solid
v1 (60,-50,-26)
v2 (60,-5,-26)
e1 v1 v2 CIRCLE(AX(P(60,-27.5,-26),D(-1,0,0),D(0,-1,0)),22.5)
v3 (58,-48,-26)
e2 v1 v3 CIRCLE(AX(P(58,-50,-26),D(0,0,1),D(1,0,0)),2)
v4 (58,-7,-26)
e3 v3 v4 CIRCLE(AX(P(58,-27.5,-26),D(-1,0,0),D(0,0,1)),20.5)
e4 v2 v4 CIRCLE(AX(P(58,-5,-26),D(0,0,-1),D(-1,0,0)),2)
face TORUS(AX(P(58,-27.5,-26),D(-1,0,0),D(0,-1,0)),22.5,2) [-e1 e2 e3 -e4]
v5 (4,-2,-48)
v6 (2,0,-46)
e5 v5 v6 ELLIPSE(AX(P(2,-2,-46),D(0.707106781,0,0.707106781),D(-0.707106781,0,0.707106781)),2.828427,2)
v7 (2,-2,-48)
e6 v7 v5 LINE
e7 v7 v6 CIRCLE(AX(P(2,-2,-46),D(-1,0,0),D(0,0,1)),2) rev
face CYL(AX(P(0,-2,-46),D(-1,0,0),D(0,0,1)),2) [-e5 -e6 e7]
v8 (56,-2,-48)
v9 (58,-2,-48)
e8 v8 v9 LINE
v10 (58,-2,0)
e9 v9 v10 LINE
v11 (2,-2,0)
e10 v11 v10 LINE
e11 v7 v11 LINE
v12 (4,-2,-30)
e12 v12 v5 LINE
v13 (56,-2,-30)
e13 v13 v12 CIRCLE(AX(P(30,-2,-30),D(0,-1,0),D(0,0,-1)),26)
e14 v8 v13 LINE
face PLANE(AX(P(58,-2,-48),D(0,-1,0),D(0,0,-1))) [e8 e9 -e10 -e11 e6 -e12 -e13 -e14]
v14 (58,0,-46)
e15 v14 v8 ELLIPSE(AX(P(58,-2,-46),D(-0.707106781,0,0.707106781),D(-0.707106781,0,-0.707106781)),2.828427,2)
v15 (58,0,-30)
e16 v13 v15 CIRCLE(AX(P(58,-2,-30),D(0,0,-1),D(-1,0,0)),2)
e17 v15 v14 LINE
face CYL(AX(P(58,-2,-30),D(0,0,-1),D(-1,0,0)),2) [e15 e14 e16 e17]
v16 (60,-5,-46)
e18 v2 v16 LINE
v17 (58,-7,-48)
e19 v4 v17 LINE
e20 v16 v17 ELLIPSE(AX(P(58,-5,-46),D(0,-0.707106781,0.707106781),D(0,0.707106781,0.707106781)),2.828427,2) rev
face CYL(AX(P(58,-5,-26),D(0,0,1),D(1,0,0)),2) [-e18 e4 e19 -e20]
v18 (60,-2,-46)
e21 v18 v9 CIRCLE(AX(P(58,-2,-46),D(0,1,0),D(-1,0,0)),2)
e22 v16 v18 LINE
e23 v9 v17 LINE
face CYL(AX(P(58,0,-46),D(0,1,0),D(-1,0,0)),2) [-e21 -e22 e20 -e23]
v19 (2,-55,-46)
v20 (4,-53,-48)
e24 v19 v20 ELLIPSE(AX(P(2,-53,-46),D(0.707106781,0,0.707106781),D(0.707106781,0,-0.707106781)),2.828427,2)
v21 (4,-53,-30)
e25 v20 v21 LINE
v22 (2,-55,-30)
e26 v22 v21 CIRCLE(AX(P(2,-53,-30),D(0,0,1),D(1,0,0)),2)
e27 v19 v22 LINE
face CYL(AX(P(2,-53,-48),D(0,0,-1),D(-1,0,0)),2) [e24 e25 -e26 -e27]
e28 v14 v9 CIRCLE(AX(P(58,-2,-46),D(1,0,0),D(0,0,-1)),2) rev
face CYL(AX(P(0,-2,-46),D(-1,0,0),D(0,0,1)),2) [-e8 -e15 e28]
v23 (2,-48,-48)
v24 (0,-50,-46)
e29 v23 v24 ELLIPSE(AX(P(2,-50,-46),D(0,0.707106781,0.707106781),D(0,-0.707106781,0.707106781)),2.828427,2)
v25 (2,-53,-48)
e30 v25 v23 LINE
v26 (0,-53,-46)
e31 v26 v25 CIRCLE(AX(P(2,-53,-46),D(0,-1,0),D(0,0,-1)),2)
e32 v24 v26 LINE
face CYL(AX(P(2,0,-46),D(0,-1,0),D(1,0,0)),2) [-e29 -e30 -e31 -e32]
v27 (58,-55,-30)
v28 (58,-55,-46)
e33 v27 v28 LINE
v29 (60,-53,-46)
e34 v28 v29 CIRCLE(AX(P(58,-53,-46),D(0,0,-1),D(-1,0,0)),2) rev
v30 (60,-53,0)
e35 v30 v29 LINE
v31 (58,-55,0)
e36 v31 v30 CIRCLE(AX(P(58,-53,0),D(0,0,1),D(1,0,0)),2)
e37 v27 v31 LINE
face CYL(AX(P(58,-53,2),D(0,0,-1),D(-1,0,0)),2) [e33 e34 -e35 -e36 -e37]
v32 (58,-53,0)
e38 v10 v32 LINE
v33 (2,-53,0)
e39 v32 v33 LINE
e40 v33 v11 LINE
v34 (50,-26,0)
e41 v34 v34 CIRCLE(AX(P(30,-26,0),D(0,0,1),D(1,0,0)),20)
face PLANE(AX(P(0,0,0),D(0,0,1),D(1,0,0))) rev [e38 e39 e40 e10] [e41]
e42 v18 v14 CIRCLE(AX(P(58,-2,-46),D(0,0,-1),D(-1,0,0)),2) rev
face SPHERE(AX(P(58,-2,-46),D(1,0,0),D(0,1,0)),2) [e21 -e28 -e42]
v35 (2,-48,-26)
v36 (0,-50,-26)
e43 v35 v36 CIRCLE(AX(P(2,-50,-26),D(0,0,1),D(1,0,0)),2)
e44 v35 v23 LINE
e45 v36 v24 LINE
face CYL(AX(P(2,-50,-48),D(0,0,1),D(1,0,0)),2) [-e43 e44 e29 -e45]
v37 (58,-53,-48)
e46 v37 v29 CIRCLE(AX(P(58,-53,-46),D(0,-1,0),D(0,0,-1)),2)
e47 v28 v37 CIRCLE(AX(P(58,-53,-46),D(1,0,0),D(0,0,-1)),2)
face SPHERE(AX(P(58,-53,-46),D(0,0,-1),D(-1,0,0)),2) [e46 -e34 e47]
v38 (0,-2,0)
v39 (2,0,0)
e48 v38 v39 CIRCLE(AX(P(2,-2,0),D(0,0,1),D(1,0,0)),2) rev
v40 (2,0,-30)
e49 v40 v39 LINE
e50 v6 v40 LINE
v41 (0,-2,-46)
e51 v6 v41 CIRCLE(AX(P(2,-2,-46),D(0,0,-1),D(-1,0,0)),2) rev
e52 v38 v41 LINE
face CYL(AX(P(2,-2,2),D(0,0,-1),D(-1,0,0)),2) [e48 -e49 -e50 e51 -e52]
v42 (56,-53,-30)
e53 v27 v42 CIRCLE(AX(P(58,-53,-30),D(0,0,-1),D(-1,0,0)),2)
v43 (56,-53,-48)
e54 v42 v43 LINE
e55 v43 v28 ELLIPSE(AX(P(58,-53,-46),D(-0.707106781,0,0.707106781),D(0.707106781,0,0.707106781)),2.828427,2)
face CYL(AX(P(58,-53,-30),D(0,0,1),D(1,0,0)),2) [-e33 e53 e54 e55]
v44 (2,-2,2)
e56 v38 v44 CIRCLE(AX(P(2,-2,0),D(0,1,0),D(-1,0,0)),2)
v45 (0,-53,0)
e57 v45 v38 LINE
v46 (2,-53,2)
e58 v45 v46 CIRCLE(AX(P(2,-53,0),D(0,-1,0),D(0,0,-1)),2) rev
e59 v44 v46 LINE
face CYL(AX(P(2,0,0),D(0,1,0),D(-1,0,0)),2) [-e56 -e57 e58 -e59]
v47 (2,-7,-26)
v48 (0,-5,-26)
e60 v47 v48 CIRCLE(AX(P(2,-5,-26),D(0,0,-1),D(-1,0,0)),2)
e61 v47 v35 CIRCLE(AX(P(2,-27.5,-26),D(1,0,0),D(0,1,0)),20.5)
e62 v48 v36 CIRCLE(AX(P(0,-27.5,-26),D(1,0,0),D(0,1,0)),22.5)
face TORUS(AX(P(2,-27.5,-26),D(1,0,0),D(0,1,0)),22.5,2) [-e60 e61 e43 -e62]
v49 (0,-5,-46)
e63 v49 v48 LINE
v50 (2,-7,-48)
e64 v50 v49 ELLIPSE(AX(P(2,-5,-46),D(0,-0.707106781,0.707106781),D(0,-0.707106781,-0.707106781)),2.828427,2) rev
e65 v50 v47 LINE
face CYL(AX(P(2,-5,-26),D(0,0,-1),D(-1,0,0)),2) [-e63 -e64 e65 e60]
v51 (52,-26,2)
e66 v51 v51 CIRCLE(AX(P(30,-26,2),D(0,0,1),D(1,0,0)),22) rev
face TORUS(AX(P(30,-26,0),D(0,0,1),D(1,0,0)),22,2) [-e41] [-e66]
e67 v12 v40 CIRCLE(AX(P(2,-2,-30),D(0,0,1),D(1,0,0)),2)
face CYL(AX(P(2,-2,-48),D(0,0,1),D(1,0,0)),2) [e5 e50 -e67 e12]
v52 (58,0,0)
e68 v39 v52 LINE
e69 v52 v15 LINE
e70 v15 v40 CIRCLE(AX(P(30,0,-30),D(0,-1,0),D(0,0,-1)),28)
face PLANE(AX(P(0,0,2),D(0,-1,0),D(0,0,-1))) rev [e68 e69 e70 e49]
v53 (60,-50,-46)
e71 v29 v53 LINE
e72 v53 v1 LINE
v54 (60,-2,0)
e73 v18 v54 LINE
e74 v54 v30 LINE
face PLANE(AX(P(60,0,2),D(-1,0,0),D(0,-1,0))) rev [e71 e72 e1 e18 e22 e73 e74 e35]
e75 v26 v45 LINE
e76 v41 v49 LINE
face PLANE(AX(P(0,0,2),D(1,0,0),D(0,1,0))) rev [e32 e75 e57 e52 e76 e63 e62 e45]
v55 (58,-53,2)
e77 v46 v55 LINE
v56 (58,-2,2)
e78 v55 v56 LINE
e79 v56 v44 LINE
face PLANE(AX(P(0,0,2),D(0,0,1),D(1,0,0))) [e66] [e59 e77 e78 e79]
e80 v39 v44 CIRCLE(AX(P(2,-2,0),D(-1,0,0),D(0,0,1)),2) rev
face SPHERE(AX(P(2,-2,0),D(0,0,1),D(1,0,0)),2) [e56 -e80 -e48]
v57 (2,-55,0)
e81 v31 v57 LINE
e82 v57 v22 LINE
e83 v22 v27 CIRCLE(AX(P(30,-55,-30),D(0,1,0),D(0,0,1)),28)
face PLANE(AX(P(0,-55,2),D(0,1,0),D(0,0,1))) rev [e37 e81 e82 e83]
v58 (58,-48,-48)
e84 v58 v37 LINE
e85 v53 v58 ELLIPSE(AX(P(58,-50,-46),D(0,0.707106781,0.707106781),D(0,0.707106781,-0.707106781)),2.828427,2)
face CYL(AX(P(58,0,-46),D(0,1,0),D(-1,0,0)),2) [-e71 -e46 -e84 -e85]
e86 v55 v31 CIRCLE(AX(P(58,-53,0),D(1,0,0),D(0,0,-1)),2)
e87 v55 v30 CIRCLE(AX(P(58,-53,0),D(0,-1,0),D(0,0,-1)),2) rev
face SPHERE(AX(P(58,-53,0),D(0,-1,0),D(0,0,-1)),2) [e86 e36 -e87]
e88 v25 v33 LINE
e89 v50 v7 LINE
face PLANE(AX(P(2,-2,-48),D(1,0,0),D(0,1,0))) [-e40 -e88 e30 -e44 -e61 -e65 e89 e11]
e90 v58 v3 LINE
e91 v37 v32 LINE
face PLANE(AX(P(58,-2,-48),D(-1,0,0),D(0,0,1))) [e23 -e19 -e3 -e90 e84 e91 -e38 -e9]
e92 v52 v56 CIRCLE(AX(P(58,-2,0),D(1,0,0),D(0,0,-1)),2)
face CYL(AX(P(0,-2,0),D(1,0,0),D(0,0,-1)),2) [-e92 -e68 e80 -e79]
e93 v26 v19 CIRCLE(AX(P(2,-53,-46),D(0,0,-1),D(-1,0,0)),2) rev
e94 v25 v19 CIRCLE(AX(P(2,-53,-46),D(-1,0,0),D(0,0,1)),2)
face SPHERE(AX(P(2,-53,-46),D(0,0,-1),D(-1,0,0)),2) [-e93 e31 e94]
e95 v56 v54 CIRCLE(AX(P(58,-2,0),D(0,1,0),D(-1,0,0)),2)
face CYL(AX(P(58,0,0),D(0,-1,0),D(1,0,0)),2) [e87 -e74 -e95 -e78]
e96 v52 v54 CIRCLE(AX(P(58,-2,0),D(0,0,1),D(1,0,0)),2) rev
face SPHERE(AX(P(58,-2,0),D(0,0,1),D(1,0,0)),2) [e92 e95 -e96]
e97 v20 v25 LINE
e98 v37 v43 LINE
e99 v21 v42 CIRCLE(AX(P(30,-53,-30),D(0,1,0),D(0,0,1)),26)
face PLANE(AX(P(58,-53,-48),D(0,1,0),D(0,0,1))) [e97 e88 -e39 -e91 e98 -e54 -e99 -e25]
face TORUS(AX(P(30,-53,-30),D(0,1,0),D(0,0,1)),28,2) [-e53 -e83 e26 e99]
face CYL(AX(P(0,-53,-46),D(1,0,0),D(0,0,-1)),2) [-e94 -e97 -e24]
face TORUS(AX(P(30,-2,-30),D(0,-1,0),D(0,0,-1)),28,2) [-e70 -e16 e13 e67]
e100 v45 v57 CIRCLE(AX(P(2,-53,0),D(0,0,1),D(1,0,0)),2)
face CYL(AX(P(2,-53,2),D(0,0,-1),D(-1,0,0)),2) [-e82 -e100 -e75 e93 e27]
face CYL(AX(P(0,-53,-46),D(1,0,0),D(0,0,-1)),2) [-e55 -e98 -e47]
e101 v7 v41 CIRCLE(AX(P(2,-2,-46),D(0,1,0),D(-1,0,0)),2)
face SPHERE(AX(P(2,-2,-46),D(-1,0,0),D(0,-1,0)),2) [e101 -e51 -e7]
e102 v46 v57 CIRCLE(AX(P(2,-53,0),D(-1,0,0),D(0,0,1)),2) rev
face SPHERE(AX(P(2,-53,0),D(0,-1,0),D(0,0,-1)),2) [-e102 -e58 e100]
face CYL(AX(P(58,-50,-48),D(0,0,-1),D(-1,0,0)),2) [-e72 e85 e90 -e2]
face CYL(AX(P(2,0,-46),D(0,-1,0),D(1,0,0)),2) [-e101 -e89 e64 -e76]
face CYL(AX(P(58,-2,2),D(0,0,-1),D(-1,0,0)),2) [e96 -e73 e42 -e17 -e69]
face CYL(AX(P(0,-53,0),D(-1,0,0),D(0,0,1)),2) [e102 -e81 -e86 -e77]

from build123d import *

# Parameters (mm, degrees)
SKETCH_1_W          = 60
SKETCH_1_H          = 55
SKETCH_1_R          = 20
EXTRUDE_1_DEPTH     = 2
SKETCH_2_W          = 60
SKETCH_2_H          = 55
SKETCH_2_W_2        = 56
SKETCH_2_H_2        = 51
EXTRUDE_2_DEPTH     = 48
CUT_EXTRUDE_1_REACH = 96.493
CUT_EXTRUDE_2_REACH = 96.493
FILLET_1_R          = 2


with BuildPart() as part:
    # 草图1 → 凸台-拉伸1 (new body)
    with BuildSketch(Plane.XY):
        with Locations((30, -27.5)):
            Rectangle(SKETCH_1_W, SKETCH_1_H)
        with Locations((30, -26)):
            Circle(SKETCH_1_R, mode=Mode.SUBTRACT)
    extrude(amount=EXTRUDE_1_DEPTH)

    # 草图2 → 凸台-拉伸2 (add)
    with BuildSketch(Plane(origin=(0, 0, 0), x_dir=(-1, 0, 0), z_dir=(0, 0, -1))):
        with Locations((-30, -27.5)):
            Rectangle(SKETCH_2_W, SKETCH_2_H)
        with Locations((-30, -27.5)):
            Rectangle(SKETCH_2_W_2, SKETCH_2_H_2, mode=Mode.SUBTRACT)
    extrude(amount=EXTRUDE_2_DEPTH)

    # 切除-拉伸1: up to this face of the body (flat: up to its plane)
    cut_extrude_1_end = Plane(part.part.faces().sort_by_distance((30, 0, -23))[0])
    # 草图3 → 切除-拉伸1 (cut, up to the picked face)
    with BuildSketch(Plane.XZ.offset(55), mode=Mode.PRIVATE) as cut_extrude_1_sk1:
        with BuildLine():
            Line((30, -48), (4, -48))
            Line((4, -48), (4, -30))
            ThreePointArc((4, -30), (30, -4), (56, -30))
            Line((56, -30), (56, -48))
            Line((56, -48), (30, -48))
        make_face()
    cut_extrude_1_tool1 = split(extrude(cut_extrude_1_sk1.sketch, amount=-CUT_EXTRUDE_1_REACH, mode=Mode.PRIVATE), bisect_by=cut_extrude_1_end, keep=Keep.BOTH, mode=Mode.PRIVATE)
    add(cut_extrude_1_tool1.solids().sort_by(Axis((30, -55, -28.351568), (0, 1, 0)))[0], mode=Mode.SUBTRACT)

    # 切除-拉伸2: up to this face of the body (flat: up to its plane)
    cut_extrude_2_end = Plane(part.part.faces().sort_by_distance((60, -27.5, -23))[0])
    # 草图4 → 切除-拉伸2 (cut, up to the picked face)
    with BuildSketch(Plane.ZY, mode=Mode.PRIVATE) as cut_extrude_2_sk1:
        with BuildLine():
            Line((-26, -7), (-48, -7))
            Line((-48, -7), (-48, -48))
            Line((-48, -48), (-26, -48))
            ThreePointArc((-26, -48), (-5.5, -27.5), (-26, -7))
        make_face()
    cut_extrude_2_tool1 = split(extrude(cut_extrude_2_sk1.sketch, amount=-CUT_EXTRUDE_2_REACH, mode=Mode.PRIVATE), bisect_by=cut_extrude_2_end, keep=Keep.BOTH, mode=Mode.PRIVATE)
    add(cut_extrude_2_tool1.solids().sort_by(Axis((0, -27.5, -28.674932), (1, 0, 0)))[0], mode=Mode.SUBTRACT)

    # 圆角1
    fillet_1_edges = [part.edges().sort_by_distance(p)[0] for p in [
        (56, 0, -39),
        (58, 0, -48),
        (2, 0, -48),
        (4, 0, -39),
        (30, 0, -4),
        (0, -7, -37),
        (0, -3.5, -48),
        (0, 0, -23),
        (0, -51.5, -48),
        (0, -48, -37),
        (0, -27.5, -5.5),
        (10, -26, 2),
        (30, 0, 2),
        (0, -27.5, 2),
        (60, -27.5, 2),
        (60, 0, -23),
        (60, -3.5, -48),
        (60, -7, -37),
        (60, -27.5, -5.5),
        (60, -48, -37),
        (60, -51.5, -48),
        (0, -55, -23),
        (30, -55, 2),
        (60, -55, -23),
        (58, -55, -48),
        (56, -55, -39),
        (30, -55, -4),
        (4, -55, -39),
        (2, -55, -48),
    ]]
    fillet(fillet_1_edges, radius=FILLET_1_R - 0.0001)  # a hair under: the kernel refuses the full size


solid = part.part
